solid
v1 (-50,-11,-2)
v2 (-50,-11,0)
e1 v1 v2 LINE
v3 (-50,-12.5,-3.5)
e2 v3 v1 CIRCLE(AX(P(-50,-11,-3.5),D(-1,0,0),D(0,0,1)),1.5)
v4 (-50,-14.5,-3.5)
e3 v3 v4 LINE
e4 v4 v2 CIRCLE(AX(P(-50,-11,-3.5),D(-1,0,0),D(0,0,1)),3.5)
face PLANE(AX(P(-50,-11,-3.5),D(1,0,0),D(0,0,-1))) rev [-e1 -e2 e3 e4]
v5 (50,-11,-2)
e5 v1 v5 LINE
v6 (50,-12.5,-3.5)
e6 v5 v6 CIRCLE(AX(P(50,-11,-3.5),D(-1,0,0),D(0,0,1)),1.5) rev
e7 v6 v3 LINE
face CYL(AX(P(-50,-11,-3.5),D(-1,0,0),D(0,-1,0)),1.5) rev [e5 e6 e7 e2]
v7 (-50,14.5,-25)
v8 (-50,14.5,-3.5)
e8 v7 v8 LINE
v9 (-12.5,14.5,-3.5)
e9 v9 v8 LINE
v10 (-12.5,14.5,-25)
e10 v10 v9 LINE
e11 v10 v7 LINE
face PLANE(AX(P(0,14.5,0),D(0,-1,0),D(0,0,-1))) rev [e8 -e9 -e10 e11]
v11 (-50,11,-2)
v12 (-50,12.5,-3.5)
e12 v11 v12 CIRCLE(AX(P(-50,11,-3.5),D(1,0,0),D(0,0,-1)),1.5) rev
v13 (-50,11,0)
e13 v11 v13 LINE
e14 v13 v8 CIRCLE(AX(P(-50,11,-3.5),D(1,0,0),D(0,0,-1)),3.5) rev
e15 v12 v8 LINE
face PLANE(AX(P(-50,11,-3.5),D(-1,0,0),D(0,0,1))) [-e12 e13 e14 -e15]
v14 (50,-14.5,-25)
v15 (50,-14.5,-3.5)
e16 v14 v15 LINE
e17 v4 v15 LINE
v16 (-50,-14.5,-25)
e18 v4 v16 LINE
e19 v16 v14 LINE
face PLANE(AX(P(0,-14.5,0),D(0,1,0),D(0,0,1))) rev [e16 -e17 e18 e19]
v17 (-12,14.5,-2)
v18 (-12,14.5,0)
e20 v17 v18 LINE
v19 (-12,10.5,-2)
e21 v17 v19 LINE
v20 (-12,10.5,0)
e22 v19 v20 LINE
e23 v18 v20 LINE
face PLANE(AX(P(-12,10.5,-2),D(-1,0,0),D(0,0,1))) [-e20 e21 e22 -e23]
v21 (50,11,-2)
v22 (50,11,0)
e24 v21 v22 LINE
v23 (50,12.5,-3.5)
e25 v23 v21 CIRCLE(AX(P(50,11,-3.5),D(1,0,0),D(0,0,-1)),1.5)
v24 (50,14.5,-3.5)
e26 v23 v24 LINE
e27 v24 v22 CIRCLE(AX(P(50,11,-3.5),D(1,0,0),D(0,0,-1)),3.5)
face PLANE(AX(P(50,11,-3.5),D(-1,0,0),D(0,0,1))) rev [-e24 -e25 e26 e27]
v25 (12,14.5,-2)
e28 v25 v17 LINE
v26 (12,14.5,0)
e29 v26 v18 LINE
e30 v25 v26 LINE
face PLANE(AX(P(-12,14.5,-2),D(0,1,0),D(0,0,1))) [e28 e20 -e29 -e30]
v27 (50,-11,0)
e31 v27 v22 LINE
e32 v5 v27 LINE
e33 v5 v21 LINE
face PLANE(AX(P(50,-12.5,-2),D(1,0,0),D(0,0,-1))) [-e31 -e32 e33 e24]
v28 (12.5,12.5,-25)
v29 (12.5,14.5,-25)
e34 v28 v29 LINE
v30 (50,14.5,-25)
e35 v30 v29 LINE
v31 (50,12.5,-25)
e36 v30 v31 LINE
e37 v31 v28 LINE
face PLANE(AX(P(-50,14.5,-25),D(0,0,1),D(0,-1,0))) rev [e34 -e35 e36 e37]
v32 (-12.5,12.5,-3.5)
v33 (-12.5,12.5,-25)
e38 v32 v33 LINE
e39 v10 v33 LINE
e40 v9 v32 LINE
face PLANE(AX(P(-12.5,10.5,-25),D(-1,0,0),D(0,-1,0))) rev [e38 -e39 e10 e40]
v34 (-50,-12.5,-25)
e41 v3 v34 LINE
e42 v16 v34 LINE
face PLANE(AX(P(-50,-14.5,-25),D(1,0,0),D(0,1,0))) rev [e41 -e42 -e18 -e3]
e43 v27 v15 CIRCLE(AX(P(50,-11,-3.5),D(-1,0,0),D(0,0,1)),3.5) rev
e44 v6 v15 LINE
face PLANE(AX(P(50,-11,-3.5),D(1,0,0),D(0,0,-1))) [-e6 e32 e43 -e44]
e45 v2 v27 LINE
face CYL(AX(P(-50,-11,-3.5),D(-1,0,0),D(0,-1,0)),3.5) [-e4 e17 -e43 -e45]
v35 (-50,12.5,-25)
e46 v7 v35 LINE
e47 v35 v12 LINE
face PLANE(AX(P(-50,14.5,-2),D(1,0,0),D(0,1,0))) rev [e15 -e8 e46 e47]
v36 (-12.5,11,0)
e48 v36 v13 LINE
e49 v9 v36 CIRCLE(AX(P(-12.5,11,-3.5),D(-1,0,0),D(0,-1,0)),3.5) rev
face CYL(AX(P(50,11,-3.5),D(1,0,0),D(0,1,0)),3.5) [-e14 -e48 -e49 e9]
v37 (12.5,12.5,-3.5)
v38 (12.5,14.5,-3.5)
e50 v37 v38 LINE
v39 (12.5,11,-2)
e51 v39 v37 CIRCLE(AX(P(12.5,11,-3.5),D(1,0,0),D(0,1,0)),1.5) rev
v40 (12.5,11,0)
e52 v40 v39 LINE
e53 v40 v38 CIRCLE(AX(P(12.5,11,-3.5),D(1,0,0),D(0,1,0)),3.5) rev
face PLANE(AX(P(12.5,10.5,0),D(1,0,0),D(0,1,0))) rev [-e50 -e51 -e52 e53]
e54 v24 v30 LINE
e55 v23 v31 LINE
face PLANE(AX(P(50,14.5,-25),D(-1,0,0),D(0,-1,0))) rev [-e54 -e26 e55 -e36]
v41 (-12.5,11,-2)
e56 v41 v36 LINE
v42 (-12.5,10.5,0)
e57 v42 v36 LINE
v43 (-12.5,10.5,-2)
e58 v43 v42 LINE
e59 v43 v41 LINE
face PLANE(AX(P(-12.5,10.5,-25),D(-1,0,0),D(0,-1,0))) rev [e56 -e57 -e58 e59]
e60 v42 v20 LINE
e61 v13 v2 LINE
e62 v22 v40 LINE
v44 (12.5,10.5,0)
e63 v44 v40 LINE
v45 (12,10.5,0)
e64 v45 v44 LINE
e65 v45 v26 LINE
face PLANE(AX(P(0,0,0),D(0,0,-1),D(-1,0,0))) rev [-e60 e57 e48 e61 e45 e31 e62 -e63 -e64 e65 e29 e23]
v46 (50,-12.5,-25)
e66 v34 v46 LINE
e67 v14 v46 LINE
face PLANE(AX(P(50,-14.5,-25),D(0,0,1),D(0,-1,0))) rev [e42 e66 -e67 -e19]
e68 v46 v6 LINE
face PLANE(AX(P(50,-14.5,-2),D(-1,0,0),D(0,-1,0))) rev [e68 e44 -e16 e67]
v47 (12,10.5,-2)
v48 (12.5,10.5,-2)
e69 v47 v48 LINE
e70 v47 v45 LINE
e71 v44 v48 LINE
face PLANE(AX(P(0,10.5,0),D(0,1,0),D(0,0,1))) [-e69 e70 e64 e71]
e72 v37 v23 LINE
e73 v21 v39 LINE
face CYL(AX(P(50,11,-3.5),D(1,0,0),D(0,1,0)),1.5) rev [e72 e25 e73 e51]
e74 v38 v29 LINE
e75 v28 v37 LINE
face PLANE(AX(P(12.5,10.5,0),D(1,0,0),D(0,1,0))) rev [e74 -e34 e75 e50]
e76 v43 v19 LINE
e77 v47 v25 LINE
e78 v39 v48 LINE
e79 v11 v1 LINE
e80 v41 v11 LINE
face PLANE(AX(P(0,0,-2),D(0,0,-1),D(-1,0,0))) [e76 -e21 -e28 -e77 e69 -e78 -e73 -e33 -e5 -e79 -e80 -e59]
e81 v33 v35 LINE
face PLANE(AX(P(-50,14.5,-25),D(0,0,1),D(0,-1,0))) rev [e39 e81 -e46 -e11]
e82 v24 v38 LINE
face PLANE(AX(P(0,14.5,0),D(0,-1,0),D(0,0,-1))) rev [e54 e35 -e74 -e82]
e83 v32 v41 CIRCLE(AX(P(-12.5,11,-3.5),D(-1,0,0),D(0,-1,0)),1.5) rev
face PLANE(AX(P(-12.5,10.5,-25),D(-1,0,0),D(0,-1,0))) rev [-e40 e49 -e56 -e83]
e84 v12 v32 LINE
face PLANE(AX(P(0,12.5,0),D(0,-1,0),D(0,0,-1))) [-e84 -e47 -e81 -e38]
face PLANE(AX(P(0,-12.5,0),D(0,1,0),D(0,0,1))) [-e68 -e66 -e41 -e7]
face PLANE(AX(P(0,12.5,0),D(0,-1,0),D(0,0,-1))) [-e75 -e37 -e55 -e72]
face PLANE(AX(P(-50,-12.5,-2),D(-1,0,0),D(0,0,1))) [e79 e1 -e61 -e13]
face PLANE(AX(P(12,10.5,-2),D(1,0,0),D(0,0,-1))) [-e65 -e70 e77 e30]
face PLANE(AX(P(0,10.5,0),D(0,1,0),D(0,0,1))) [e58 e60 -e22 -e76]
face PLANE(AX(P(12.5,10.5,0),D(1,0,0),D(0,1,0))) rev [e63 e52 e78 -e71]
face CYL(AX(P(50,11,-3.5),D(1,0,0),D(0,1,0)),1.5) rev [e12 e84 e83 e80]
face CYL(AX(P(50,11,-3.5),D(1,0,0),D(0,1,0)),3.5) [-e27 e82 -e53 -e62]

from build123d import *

# Parameters (mm, degrees)
SKETCH_1_W                         = 100
SKETCH_1_H                         = 25
SM_BASE_FLANGE_1_DEPTH             = 2
SM_EDGE_FLANGE_1_STRIP_W           = 11
SM_EDGE_FLANGE_1_STRIP_H           = 2
SM_EDGE_FLANGE_1_STRIP_CUT_DEPTH   = 100
SM_EDGE_FLANGE_1_STRIP_2_W         = 11
SM_EDGE_FLANGE_1_STRIP_2_H         = 2
SM_EDGE_FLANGE_1_STRIP_CUT_2_DEPTH = 100
SM_EDGE_FLANGE_1_DEPTH             = 100
SM_EDGE_FLANGE_1_BEND_DEPTH        = 100
SKETCH_12_W                        = 25
SKETCH_12_H                        = 25
CUT_EXTRUDE_1_DEPTH                = 4
SKETCH_24_W                        = 24
SKETCH_24_H                        = 4
EXTRUDE_1_DEPTH                    = 2


# Sheet-metal steps are written as plain solids
with BuildPart() as part:
    # Sketch 1 → Базовая кромка1 (new body)
    with BuildSketch(Plane.XY):
        Rectangle(SKETCH_1_W, SKETCH_1_H)
    extrude(amount=-SM_BASE_FLANGE_1_DEPTH)

    # Ребро-кромка1 strip (across the edge) → Ребро-кромка1 strip cut (cut)
    with BuildSketch(Plane(origin=(-50, 12.5, -2), x_dir=(0, -1, 0), z_dir=(1, 0, 0))):
        with Locations((-4, -1)):
            Rectangle(SM_EDGE_FLANGE_1_STRIP_W, SM_EDGE_FLANGE_1_STRIP_H)
    extrude(amount=SM_EDGE_FLANGE_1_STRIP_CUT_DEPTH, mode=Mode.SUBTRACT)

    # Ребро-кромка1 strip 2 (across the edge) → Ребро-кромка1 strip cut 2 (cut)
    with BuildSketch(Plane(origin=(50, -12.5, -2), x_dir=(0, 1, 0), z_dir=(-1, 0, 0))):
        with Locations((-4, -1)):
            Rectangle(SM_EDGE_FLANGE_1_STRIP_2_W, SM_EDGE_FLANGE_1_STRIP_2_H)
    extrude(amount=SM_EDGE_FLANGE_1_STRIP_CUT_2_DEPTH, mode=Mode.SUBTRACT)

    # Ребро-кромка1 section (across the edge) → Ребро-кромка1 (add)
    with BuildSketch(Plane(origin=(-50, 12.5, -2), x_dir=(0, -1, 0), z_dir=(1, 0, 0))):
        with BuildLine():
            Line((-2, 1.5), (-2, 23))
            Line((-2, 23), (0, 23))
            Line((0, 23), (0, 1.5))
            ThreePointArc((0, 1.5), (0.439339828, 0.439339828), (1.5, 0))
            Line((1.5, 0), (1.5, -2))
            ThreePointArc((1.5, -2), (-0.974873734, -0.974873734), (-2, 1.5))
        make_face()
    extrude(amount=SM_EDGE_FLANGE_1_DEPTH)

    # Ребро-кромка1 section 2 (across the edge) → Ребро-кромка1 bend (add)
    with BuildSketch(Plane(origin=(50, -12.5, -2), x_dir=(0, 1, 0), z_dir=(-1, 0, 0))):
        with BuildLine():
            Line((-2, 1.5), (-2, 23))
            Line((-2, 23), (0, 23))
            Line((0, 23), (0, 1.5))
            ThreePointArc((0, 1.5), (0.439339828, 0.439339828), (1.5, 0))
            Line((1.5, 0), (1.5, -2))
            ThreePointArc((1.5, -2), (-0.974873734, -0.974873734), (-2, 1.5))
        make_face()
    extrude(amount=SM_EDGE_FLANGE_1_BEND_DEPTH)

    # Эскиз12 → Вырез-Вытянуть1 (cut)
    with BuildSketch(Plane(origin=(0, 14.5, 0), x_dir=(1, 0, 0), z_dir=(0, 1, 0))):
        with Locations((0, 12.5)):
            Rectangle(SKETCH_12_W, SKETCH_12_H)
    extrude(amount=-CUT_EXTRUDE_1_DEPTH, mode=Mode.SUBTRACT)

    # Эскиз24 → Бобышка-Вытянуть1 (add)
    with BuildSketch(Plane.XY):
        with Locations((0, 12.5)):
            Rectangle(SKETCH_24_W, SKETCH_24_H)
    extrude(amount=-EXTRUDE_1_DEPTH)


solid = part.part
